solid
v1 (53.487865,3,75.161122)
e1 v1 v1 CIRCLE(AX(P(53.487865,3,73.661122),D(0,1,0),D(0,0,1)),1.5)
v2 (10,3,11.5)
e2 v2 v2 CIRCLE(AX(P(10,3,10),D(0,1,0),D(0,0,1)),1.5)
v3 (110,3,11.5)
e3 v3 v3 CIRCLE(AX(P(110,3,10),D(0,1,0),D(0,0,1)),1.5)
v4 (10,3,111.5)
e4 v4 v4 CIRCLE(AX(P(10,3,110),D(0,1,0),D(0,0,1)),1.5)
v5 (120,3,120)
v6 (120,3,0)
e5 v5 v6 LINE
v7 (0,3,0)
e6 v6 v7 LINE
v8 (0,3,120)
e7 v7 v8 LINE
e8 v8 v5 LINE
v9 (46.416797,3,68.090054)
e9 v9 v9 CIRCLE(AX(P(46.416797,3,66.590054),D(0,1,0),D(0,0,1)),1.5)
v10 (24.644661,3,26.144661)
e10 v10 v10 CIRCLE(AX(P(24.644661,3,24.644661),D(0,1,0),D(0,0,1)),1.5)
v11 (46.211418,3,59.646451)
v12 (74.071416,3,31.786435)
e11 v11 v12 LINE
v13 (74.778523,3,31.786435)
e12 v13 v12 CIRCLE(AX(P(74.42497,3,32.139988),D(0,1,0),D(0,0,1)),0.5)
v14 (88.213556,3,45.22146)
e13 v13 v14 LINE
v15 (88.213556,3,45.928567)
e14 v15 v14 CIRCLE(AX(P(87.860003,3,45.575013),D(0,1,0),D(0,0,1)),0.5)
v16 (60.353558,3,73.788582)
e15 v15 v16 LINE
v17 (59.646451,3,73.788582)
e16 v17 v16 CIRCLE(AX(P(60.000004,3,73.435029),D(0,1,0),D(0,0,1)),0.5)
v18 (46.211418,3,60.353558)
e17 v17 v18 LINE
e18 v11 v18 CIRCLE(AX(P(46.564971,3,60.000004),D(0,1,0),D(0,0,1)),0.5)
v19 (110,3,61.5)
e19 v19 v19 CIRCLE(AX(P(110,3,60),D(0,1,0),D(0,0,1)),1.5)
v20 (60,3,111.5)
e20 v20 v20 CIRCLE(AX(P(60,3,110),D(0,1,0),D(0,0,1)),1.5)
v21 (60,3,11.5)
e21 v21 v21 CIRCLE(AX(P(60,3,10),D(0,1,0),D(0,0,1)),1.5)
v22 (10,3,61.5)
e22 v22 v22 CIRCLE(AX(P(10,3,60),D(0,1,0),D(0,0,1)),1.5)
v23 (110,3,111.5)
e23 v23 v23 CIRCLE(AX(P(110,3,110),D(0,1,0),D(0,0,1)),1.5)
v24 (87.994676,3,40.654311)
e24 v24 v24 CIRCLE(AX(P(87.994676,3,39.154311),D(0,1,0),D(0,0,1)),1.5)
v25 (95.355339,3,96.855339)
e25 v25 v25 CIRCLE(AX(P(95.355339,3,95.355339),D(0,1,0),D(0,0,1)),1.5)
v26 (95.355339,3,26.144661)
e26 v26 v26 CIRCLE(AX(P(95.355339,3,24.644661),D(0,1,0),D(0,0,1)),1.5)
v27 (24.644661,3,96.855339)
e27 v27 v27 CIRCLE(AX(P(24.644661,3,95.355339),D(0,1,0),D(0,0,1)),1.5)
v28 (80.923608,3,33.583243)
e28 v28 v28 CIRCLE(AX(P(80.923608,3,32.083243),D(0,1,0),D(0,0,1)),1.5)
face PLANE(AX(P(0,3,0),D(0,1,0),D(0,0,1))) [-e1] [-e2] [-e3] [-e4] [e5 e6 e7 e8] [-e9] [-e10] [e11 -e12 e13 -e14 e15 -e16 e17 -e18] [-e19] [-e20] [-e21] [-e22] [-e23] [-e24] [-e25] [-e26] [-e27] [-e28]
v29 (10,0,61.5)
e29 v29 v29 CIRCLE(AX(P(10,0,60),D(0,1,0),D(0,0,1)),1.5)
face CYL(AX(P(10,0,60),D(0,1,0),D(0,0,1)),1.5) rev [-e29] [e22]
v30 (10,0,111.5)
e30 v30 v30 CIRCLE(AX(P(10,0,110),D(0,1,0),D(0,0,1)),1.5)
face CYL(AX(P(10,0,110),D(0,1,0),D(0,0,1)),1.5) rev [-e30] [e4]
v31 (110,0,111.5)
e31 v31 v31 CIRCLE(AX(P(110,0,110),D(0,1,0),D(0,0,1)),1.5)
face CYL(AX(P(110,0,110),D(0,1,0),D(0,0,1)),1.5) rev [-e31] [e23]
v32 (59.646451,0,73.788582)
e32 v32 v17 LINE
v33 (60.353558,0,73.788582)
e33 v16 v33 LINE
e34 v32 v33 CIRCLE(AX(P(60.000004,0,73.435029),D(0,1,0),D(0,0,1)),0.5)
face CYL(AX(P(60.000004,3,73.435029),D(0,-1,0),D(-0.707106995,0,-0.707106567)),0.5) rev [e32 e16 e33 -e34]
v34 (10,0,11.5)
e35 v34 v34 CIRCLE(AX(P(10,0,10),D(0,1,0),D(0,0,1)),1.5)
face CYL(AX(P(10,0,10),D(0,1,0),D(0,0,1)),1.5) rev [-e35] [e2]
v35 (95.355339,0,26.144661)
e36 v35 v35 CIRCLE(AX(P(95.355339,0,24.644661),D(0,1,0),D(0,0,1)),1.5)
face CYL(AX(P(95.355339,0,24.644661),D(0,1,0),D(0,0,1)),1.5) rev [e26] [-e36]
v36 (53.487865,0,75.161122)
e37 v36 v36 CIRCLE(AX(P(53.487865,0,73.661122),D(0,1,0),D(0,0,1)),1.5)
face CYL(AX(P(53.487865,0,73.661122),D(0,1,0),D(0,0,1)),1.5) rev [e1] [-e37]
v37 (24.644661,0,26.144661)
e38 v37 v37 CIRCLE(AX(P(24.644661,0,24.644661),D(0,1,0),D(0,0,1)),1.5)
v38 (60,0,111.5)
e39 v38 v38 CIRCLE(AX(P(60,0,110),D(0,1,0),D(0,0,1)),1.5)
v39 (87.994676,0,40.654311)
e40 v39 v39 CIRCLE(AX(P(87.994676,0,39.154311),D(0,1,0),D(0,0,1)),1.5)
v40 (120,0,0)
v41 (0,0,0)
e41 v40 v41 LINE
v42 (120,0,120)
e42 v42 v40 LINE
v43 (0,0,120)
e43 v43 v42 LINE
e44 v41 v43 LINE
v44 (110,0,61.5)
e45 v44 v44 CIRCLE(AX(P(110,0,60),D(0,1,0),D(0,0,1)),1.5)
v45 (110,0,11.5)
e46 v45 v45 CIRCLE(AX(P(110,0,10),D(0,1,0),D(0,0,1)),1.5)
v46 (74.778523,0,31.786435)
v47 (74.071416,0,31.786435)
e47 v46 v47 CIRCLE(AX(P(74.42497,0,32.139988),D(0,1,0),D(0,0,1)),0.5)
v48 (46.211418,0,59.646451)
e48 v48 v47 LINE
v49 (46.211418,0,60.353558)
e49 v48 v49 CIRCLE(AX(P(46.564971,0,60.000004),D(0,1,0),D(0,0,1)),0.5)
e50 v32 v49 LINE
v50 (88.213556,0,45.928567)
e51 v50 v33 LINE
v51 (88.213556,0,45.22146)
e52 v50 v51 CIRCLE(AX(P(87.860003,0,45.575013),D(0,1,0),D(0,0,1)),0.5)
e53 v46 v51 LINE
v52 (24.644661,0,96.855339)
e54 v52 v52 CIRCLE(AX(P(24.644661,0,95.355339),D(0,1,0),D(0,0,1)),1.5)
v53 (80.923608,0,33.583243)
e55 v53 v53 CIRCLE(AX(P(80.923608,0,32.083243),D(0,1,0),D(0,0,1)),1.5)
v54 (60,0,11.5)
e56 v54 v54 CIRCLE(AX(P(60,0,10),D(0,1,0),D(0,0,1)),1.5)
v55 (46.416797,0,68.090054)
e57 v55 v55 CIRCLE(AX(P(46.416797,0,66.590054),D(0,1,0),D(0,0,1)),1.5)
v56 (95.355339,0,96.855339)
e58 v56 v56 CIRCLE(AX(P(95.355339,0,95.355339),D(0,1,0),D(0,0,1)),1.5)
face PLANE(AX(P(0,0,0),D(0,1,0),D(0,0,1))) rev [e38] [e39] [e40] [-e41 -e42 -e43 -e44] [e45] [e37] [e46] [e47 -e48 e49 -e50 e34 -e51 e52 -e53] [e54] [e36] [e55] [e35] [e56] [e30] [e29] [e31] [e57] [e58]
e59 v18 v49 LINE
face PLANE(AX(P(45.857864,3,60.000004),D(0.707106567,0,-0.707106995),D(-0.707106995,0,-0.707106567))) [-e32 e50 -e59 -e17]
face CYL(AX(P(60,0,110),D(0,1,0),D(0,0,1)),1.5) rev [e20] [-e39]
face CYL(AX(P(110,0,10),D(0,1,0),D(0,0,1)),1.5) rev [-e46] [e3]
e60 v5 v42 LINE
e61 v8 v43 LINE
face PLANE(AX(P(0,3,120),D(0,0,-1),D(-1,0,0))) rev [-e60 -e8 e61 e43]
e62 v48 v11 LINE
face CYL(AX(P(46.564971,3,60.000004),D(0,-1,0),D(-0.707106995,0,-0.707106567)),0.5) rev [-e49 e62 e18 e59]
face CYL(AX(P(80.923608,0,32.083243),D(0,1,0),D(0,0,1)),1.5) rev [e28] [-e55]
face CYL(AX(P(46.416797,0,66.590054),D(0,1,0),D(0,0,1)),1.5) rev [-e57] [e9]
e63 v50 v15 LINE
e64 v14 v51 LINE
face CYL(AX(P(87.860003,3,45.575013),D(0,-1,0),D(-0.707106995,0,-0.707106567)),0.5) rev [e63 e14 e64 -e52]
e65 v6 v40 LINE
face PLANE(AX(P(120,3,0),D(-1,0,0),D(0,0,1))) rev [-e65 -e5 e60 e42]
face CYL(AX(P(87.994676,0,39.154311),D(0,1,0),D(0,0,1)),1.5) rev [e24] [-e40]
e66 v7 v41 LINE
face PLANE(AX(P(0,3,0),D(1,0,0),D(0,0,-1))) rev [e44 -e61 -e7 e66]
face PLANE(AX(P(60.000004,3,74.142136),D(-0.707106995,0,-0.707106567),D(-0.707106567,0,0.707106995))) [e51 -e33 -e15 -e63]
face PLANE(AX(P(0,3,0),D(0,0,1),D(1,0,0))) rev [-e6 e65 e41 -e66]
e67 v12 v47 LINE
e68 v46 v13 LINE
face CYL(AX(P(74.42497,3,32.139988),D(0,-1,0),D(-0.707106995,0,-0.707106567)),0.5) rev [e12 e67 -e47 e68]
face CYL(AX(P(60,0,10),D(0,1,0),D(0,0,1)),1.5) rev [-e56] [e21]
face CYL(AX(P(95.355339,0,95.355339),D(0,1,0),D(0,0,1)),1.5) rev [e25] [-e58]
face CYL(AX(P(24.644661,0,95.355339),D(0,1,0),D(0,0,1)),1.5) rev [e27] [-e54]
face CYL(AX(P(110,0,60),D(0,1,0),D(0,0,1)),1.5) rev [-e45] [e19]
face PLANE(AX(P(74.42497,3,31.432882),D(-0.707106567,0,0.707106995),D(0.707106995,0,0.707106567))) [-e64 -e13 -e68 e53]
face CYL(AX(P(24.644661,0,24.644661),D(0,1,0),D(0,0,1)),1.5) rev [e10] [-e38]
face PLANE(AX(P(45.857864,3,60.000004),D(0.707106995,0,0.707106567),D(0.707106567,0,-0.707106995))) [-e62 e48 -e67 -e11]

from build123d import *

# Parameters (mm, degrees)
SKETCH1_W           = 120
SKETCH1_H           = 120
BOSS_EXTRUDE1_DEPTH = 3
CAVITY1_DEPTH       = 3
SKETCH5_R           = 1.5
CUT_EXTRUDE3_DEPTH  = 3
SKETCH6_R           = 1.5
CUT_EXTRUDE4_DEPTH  = 3
SKETCH8_R           = 1.5
CUT_EXTRUDE6_DEPTH  = 3


# Read off the part's stored shape, not the designer's step: Cavity1
with BuildPart() as part:
    # Sketch1 → Boss-Extrude1 (new body)
    with BuildSketch(Plane(origin=(0, 0, 0), x_dir=(1, 0, 0), z_dir=(0, 1, 0))):
        with Locations((60, -60)):
            Rectangle(SKETCH1_W, SKETCH1_H)
    extrude(amount=BOSS_EXTRUDE1_DEPTH)

    # Cavity1 outline → Cavity1 (cut)
    with BuildSketch(Plane(origin=(0, 0, 0), x_dir=(1, 0, 0), z_dir=(0, 1, 0))):
        with BuildLine():
            Line((46.211417874, -60.353557562), (59.646450781, -73.78858234))
            ThreePointArc((59.646450781, -73.78858234), (60.000004216, -73.935028843), (60.353557562, -73.788582126))
            Line((60.353557562, -73.788582126), (88.213556312, -45.928566518))
            ThreePointArc((88.213556312, -45.928566518), (88.360002815, -45.575013083), (88.213556098, -45.221459737))
            Line((88.213556098, -45.221459737), (74.778523191, -31.786434959))
            ThreePointArc((74.778523191, -31.786434959), (74.424969756, -31.639988457), (74.07141641, -31.786435173))
            Line((74.07141641, -31.786435173), (46.21141766, -59.646450781))
            ThreePointArc((46.21141766, -59.646450781), (46.064971157, -60.000004216), (46.211417874, -60.353557562))
        make_face()
    extrude(amount=CAVITY1_DEPTH, mode=Mode.SUBTRACT)

    # Sketch5 → Cut-Extrude3 (cut)
    with BuildSketch(Plane(origin=(0, 3, 0), x_dir=(1, 0, 0), z_dir=(0, 1, 0))):
        with Locations(Location((60, -10, 0), (0, 0, 270))):
            Circle(SKETCH5_R)
        with Locations(Location((95.355339059, -24.644660941, 0), (0, 0, 270))):
            Circle(SKETCH5_R)
        with Locations(Location((110, -60, 0), (0, 0, 270))):
            Circle(SKETCH5_R)
        with Locations(Location((95.355339059, -95.355339059, 0), (0, 0, 270))):
            Circle(SKETCH5_R)
        with Locations(Location((60, -110, 0), (0, 0, 270))):
            Circle(SKETCH5_R)
        with Locations(Location((24.644660941, -95.355339059, 0), (0, 0, 270))):
            Circle(SKETCH5_R)
        with Locations(Location((10, -60, 0), (0, 0, 270))):
            Circle(SKETCH5_R)
        with Locations(Location((24.644660941, -24.644660941, 0), (0, 0, 270))):
            Circle(SKETCH5_R)
    extrude(amount=-CUT_EXTRUDE3_DEPTH, mode=Mode.SUBTRACT)

    # Sketch6 → Cut-Extrude4 (cut)
    with BuildSketch(Plane(origin=(0, 3, 0), x_dir=(1, 0, 0), z_dir=(0, 1, 0))):
        with Locations(Location((10, -10, 0), (0, 0, 270))):
            Circle(SKETCH6_R)
        with Locations(Location((110, -10, 0), (0, 0, 270))):
            Circle(SKETCH6_R)
        with Locations(Location((110, -110, 0), (0, 0, 270))):
            Circle(SKETCH6_R)
        with Locations(Location((10, -110, 0), (0, 0, 270))):
            Circle(SKETCH6_R)
    extrude(amount=-CUT_EXTRUDE4_DEPTH, mode=Mode.SUBTRACT)

    # Sketch8 → Cut-Extrude6 (cut)
    with BuildSketch(Plane(origin=(0, 3, 0), x_dir=(1, 0, 0), z_dir=(0, 1, 0))):
        with Locations(Location((87.994675608, -39.154311265, 0), (0, 0, 270))):
            Circle(SKETCH8_R)
        with Locations(Location((80.923607796, -32.083243453, 0), (0, 0, 270))):
            Circle(SKETCH8_R)
        with Locations(Location((46.416796874, -66.590054375, 0), (0, 0, 270))):
            Circle(SKETCH8_R)
        with Locations(Location((53.487864686, -73.661122187, 0), (0, 0, 270))):
            Circle(SKETCH8_R)
    extrude(amount=-CUT_EXTRUDE6_DEPTH, mode=Mode.SUBTRACT)


solid = part.part
